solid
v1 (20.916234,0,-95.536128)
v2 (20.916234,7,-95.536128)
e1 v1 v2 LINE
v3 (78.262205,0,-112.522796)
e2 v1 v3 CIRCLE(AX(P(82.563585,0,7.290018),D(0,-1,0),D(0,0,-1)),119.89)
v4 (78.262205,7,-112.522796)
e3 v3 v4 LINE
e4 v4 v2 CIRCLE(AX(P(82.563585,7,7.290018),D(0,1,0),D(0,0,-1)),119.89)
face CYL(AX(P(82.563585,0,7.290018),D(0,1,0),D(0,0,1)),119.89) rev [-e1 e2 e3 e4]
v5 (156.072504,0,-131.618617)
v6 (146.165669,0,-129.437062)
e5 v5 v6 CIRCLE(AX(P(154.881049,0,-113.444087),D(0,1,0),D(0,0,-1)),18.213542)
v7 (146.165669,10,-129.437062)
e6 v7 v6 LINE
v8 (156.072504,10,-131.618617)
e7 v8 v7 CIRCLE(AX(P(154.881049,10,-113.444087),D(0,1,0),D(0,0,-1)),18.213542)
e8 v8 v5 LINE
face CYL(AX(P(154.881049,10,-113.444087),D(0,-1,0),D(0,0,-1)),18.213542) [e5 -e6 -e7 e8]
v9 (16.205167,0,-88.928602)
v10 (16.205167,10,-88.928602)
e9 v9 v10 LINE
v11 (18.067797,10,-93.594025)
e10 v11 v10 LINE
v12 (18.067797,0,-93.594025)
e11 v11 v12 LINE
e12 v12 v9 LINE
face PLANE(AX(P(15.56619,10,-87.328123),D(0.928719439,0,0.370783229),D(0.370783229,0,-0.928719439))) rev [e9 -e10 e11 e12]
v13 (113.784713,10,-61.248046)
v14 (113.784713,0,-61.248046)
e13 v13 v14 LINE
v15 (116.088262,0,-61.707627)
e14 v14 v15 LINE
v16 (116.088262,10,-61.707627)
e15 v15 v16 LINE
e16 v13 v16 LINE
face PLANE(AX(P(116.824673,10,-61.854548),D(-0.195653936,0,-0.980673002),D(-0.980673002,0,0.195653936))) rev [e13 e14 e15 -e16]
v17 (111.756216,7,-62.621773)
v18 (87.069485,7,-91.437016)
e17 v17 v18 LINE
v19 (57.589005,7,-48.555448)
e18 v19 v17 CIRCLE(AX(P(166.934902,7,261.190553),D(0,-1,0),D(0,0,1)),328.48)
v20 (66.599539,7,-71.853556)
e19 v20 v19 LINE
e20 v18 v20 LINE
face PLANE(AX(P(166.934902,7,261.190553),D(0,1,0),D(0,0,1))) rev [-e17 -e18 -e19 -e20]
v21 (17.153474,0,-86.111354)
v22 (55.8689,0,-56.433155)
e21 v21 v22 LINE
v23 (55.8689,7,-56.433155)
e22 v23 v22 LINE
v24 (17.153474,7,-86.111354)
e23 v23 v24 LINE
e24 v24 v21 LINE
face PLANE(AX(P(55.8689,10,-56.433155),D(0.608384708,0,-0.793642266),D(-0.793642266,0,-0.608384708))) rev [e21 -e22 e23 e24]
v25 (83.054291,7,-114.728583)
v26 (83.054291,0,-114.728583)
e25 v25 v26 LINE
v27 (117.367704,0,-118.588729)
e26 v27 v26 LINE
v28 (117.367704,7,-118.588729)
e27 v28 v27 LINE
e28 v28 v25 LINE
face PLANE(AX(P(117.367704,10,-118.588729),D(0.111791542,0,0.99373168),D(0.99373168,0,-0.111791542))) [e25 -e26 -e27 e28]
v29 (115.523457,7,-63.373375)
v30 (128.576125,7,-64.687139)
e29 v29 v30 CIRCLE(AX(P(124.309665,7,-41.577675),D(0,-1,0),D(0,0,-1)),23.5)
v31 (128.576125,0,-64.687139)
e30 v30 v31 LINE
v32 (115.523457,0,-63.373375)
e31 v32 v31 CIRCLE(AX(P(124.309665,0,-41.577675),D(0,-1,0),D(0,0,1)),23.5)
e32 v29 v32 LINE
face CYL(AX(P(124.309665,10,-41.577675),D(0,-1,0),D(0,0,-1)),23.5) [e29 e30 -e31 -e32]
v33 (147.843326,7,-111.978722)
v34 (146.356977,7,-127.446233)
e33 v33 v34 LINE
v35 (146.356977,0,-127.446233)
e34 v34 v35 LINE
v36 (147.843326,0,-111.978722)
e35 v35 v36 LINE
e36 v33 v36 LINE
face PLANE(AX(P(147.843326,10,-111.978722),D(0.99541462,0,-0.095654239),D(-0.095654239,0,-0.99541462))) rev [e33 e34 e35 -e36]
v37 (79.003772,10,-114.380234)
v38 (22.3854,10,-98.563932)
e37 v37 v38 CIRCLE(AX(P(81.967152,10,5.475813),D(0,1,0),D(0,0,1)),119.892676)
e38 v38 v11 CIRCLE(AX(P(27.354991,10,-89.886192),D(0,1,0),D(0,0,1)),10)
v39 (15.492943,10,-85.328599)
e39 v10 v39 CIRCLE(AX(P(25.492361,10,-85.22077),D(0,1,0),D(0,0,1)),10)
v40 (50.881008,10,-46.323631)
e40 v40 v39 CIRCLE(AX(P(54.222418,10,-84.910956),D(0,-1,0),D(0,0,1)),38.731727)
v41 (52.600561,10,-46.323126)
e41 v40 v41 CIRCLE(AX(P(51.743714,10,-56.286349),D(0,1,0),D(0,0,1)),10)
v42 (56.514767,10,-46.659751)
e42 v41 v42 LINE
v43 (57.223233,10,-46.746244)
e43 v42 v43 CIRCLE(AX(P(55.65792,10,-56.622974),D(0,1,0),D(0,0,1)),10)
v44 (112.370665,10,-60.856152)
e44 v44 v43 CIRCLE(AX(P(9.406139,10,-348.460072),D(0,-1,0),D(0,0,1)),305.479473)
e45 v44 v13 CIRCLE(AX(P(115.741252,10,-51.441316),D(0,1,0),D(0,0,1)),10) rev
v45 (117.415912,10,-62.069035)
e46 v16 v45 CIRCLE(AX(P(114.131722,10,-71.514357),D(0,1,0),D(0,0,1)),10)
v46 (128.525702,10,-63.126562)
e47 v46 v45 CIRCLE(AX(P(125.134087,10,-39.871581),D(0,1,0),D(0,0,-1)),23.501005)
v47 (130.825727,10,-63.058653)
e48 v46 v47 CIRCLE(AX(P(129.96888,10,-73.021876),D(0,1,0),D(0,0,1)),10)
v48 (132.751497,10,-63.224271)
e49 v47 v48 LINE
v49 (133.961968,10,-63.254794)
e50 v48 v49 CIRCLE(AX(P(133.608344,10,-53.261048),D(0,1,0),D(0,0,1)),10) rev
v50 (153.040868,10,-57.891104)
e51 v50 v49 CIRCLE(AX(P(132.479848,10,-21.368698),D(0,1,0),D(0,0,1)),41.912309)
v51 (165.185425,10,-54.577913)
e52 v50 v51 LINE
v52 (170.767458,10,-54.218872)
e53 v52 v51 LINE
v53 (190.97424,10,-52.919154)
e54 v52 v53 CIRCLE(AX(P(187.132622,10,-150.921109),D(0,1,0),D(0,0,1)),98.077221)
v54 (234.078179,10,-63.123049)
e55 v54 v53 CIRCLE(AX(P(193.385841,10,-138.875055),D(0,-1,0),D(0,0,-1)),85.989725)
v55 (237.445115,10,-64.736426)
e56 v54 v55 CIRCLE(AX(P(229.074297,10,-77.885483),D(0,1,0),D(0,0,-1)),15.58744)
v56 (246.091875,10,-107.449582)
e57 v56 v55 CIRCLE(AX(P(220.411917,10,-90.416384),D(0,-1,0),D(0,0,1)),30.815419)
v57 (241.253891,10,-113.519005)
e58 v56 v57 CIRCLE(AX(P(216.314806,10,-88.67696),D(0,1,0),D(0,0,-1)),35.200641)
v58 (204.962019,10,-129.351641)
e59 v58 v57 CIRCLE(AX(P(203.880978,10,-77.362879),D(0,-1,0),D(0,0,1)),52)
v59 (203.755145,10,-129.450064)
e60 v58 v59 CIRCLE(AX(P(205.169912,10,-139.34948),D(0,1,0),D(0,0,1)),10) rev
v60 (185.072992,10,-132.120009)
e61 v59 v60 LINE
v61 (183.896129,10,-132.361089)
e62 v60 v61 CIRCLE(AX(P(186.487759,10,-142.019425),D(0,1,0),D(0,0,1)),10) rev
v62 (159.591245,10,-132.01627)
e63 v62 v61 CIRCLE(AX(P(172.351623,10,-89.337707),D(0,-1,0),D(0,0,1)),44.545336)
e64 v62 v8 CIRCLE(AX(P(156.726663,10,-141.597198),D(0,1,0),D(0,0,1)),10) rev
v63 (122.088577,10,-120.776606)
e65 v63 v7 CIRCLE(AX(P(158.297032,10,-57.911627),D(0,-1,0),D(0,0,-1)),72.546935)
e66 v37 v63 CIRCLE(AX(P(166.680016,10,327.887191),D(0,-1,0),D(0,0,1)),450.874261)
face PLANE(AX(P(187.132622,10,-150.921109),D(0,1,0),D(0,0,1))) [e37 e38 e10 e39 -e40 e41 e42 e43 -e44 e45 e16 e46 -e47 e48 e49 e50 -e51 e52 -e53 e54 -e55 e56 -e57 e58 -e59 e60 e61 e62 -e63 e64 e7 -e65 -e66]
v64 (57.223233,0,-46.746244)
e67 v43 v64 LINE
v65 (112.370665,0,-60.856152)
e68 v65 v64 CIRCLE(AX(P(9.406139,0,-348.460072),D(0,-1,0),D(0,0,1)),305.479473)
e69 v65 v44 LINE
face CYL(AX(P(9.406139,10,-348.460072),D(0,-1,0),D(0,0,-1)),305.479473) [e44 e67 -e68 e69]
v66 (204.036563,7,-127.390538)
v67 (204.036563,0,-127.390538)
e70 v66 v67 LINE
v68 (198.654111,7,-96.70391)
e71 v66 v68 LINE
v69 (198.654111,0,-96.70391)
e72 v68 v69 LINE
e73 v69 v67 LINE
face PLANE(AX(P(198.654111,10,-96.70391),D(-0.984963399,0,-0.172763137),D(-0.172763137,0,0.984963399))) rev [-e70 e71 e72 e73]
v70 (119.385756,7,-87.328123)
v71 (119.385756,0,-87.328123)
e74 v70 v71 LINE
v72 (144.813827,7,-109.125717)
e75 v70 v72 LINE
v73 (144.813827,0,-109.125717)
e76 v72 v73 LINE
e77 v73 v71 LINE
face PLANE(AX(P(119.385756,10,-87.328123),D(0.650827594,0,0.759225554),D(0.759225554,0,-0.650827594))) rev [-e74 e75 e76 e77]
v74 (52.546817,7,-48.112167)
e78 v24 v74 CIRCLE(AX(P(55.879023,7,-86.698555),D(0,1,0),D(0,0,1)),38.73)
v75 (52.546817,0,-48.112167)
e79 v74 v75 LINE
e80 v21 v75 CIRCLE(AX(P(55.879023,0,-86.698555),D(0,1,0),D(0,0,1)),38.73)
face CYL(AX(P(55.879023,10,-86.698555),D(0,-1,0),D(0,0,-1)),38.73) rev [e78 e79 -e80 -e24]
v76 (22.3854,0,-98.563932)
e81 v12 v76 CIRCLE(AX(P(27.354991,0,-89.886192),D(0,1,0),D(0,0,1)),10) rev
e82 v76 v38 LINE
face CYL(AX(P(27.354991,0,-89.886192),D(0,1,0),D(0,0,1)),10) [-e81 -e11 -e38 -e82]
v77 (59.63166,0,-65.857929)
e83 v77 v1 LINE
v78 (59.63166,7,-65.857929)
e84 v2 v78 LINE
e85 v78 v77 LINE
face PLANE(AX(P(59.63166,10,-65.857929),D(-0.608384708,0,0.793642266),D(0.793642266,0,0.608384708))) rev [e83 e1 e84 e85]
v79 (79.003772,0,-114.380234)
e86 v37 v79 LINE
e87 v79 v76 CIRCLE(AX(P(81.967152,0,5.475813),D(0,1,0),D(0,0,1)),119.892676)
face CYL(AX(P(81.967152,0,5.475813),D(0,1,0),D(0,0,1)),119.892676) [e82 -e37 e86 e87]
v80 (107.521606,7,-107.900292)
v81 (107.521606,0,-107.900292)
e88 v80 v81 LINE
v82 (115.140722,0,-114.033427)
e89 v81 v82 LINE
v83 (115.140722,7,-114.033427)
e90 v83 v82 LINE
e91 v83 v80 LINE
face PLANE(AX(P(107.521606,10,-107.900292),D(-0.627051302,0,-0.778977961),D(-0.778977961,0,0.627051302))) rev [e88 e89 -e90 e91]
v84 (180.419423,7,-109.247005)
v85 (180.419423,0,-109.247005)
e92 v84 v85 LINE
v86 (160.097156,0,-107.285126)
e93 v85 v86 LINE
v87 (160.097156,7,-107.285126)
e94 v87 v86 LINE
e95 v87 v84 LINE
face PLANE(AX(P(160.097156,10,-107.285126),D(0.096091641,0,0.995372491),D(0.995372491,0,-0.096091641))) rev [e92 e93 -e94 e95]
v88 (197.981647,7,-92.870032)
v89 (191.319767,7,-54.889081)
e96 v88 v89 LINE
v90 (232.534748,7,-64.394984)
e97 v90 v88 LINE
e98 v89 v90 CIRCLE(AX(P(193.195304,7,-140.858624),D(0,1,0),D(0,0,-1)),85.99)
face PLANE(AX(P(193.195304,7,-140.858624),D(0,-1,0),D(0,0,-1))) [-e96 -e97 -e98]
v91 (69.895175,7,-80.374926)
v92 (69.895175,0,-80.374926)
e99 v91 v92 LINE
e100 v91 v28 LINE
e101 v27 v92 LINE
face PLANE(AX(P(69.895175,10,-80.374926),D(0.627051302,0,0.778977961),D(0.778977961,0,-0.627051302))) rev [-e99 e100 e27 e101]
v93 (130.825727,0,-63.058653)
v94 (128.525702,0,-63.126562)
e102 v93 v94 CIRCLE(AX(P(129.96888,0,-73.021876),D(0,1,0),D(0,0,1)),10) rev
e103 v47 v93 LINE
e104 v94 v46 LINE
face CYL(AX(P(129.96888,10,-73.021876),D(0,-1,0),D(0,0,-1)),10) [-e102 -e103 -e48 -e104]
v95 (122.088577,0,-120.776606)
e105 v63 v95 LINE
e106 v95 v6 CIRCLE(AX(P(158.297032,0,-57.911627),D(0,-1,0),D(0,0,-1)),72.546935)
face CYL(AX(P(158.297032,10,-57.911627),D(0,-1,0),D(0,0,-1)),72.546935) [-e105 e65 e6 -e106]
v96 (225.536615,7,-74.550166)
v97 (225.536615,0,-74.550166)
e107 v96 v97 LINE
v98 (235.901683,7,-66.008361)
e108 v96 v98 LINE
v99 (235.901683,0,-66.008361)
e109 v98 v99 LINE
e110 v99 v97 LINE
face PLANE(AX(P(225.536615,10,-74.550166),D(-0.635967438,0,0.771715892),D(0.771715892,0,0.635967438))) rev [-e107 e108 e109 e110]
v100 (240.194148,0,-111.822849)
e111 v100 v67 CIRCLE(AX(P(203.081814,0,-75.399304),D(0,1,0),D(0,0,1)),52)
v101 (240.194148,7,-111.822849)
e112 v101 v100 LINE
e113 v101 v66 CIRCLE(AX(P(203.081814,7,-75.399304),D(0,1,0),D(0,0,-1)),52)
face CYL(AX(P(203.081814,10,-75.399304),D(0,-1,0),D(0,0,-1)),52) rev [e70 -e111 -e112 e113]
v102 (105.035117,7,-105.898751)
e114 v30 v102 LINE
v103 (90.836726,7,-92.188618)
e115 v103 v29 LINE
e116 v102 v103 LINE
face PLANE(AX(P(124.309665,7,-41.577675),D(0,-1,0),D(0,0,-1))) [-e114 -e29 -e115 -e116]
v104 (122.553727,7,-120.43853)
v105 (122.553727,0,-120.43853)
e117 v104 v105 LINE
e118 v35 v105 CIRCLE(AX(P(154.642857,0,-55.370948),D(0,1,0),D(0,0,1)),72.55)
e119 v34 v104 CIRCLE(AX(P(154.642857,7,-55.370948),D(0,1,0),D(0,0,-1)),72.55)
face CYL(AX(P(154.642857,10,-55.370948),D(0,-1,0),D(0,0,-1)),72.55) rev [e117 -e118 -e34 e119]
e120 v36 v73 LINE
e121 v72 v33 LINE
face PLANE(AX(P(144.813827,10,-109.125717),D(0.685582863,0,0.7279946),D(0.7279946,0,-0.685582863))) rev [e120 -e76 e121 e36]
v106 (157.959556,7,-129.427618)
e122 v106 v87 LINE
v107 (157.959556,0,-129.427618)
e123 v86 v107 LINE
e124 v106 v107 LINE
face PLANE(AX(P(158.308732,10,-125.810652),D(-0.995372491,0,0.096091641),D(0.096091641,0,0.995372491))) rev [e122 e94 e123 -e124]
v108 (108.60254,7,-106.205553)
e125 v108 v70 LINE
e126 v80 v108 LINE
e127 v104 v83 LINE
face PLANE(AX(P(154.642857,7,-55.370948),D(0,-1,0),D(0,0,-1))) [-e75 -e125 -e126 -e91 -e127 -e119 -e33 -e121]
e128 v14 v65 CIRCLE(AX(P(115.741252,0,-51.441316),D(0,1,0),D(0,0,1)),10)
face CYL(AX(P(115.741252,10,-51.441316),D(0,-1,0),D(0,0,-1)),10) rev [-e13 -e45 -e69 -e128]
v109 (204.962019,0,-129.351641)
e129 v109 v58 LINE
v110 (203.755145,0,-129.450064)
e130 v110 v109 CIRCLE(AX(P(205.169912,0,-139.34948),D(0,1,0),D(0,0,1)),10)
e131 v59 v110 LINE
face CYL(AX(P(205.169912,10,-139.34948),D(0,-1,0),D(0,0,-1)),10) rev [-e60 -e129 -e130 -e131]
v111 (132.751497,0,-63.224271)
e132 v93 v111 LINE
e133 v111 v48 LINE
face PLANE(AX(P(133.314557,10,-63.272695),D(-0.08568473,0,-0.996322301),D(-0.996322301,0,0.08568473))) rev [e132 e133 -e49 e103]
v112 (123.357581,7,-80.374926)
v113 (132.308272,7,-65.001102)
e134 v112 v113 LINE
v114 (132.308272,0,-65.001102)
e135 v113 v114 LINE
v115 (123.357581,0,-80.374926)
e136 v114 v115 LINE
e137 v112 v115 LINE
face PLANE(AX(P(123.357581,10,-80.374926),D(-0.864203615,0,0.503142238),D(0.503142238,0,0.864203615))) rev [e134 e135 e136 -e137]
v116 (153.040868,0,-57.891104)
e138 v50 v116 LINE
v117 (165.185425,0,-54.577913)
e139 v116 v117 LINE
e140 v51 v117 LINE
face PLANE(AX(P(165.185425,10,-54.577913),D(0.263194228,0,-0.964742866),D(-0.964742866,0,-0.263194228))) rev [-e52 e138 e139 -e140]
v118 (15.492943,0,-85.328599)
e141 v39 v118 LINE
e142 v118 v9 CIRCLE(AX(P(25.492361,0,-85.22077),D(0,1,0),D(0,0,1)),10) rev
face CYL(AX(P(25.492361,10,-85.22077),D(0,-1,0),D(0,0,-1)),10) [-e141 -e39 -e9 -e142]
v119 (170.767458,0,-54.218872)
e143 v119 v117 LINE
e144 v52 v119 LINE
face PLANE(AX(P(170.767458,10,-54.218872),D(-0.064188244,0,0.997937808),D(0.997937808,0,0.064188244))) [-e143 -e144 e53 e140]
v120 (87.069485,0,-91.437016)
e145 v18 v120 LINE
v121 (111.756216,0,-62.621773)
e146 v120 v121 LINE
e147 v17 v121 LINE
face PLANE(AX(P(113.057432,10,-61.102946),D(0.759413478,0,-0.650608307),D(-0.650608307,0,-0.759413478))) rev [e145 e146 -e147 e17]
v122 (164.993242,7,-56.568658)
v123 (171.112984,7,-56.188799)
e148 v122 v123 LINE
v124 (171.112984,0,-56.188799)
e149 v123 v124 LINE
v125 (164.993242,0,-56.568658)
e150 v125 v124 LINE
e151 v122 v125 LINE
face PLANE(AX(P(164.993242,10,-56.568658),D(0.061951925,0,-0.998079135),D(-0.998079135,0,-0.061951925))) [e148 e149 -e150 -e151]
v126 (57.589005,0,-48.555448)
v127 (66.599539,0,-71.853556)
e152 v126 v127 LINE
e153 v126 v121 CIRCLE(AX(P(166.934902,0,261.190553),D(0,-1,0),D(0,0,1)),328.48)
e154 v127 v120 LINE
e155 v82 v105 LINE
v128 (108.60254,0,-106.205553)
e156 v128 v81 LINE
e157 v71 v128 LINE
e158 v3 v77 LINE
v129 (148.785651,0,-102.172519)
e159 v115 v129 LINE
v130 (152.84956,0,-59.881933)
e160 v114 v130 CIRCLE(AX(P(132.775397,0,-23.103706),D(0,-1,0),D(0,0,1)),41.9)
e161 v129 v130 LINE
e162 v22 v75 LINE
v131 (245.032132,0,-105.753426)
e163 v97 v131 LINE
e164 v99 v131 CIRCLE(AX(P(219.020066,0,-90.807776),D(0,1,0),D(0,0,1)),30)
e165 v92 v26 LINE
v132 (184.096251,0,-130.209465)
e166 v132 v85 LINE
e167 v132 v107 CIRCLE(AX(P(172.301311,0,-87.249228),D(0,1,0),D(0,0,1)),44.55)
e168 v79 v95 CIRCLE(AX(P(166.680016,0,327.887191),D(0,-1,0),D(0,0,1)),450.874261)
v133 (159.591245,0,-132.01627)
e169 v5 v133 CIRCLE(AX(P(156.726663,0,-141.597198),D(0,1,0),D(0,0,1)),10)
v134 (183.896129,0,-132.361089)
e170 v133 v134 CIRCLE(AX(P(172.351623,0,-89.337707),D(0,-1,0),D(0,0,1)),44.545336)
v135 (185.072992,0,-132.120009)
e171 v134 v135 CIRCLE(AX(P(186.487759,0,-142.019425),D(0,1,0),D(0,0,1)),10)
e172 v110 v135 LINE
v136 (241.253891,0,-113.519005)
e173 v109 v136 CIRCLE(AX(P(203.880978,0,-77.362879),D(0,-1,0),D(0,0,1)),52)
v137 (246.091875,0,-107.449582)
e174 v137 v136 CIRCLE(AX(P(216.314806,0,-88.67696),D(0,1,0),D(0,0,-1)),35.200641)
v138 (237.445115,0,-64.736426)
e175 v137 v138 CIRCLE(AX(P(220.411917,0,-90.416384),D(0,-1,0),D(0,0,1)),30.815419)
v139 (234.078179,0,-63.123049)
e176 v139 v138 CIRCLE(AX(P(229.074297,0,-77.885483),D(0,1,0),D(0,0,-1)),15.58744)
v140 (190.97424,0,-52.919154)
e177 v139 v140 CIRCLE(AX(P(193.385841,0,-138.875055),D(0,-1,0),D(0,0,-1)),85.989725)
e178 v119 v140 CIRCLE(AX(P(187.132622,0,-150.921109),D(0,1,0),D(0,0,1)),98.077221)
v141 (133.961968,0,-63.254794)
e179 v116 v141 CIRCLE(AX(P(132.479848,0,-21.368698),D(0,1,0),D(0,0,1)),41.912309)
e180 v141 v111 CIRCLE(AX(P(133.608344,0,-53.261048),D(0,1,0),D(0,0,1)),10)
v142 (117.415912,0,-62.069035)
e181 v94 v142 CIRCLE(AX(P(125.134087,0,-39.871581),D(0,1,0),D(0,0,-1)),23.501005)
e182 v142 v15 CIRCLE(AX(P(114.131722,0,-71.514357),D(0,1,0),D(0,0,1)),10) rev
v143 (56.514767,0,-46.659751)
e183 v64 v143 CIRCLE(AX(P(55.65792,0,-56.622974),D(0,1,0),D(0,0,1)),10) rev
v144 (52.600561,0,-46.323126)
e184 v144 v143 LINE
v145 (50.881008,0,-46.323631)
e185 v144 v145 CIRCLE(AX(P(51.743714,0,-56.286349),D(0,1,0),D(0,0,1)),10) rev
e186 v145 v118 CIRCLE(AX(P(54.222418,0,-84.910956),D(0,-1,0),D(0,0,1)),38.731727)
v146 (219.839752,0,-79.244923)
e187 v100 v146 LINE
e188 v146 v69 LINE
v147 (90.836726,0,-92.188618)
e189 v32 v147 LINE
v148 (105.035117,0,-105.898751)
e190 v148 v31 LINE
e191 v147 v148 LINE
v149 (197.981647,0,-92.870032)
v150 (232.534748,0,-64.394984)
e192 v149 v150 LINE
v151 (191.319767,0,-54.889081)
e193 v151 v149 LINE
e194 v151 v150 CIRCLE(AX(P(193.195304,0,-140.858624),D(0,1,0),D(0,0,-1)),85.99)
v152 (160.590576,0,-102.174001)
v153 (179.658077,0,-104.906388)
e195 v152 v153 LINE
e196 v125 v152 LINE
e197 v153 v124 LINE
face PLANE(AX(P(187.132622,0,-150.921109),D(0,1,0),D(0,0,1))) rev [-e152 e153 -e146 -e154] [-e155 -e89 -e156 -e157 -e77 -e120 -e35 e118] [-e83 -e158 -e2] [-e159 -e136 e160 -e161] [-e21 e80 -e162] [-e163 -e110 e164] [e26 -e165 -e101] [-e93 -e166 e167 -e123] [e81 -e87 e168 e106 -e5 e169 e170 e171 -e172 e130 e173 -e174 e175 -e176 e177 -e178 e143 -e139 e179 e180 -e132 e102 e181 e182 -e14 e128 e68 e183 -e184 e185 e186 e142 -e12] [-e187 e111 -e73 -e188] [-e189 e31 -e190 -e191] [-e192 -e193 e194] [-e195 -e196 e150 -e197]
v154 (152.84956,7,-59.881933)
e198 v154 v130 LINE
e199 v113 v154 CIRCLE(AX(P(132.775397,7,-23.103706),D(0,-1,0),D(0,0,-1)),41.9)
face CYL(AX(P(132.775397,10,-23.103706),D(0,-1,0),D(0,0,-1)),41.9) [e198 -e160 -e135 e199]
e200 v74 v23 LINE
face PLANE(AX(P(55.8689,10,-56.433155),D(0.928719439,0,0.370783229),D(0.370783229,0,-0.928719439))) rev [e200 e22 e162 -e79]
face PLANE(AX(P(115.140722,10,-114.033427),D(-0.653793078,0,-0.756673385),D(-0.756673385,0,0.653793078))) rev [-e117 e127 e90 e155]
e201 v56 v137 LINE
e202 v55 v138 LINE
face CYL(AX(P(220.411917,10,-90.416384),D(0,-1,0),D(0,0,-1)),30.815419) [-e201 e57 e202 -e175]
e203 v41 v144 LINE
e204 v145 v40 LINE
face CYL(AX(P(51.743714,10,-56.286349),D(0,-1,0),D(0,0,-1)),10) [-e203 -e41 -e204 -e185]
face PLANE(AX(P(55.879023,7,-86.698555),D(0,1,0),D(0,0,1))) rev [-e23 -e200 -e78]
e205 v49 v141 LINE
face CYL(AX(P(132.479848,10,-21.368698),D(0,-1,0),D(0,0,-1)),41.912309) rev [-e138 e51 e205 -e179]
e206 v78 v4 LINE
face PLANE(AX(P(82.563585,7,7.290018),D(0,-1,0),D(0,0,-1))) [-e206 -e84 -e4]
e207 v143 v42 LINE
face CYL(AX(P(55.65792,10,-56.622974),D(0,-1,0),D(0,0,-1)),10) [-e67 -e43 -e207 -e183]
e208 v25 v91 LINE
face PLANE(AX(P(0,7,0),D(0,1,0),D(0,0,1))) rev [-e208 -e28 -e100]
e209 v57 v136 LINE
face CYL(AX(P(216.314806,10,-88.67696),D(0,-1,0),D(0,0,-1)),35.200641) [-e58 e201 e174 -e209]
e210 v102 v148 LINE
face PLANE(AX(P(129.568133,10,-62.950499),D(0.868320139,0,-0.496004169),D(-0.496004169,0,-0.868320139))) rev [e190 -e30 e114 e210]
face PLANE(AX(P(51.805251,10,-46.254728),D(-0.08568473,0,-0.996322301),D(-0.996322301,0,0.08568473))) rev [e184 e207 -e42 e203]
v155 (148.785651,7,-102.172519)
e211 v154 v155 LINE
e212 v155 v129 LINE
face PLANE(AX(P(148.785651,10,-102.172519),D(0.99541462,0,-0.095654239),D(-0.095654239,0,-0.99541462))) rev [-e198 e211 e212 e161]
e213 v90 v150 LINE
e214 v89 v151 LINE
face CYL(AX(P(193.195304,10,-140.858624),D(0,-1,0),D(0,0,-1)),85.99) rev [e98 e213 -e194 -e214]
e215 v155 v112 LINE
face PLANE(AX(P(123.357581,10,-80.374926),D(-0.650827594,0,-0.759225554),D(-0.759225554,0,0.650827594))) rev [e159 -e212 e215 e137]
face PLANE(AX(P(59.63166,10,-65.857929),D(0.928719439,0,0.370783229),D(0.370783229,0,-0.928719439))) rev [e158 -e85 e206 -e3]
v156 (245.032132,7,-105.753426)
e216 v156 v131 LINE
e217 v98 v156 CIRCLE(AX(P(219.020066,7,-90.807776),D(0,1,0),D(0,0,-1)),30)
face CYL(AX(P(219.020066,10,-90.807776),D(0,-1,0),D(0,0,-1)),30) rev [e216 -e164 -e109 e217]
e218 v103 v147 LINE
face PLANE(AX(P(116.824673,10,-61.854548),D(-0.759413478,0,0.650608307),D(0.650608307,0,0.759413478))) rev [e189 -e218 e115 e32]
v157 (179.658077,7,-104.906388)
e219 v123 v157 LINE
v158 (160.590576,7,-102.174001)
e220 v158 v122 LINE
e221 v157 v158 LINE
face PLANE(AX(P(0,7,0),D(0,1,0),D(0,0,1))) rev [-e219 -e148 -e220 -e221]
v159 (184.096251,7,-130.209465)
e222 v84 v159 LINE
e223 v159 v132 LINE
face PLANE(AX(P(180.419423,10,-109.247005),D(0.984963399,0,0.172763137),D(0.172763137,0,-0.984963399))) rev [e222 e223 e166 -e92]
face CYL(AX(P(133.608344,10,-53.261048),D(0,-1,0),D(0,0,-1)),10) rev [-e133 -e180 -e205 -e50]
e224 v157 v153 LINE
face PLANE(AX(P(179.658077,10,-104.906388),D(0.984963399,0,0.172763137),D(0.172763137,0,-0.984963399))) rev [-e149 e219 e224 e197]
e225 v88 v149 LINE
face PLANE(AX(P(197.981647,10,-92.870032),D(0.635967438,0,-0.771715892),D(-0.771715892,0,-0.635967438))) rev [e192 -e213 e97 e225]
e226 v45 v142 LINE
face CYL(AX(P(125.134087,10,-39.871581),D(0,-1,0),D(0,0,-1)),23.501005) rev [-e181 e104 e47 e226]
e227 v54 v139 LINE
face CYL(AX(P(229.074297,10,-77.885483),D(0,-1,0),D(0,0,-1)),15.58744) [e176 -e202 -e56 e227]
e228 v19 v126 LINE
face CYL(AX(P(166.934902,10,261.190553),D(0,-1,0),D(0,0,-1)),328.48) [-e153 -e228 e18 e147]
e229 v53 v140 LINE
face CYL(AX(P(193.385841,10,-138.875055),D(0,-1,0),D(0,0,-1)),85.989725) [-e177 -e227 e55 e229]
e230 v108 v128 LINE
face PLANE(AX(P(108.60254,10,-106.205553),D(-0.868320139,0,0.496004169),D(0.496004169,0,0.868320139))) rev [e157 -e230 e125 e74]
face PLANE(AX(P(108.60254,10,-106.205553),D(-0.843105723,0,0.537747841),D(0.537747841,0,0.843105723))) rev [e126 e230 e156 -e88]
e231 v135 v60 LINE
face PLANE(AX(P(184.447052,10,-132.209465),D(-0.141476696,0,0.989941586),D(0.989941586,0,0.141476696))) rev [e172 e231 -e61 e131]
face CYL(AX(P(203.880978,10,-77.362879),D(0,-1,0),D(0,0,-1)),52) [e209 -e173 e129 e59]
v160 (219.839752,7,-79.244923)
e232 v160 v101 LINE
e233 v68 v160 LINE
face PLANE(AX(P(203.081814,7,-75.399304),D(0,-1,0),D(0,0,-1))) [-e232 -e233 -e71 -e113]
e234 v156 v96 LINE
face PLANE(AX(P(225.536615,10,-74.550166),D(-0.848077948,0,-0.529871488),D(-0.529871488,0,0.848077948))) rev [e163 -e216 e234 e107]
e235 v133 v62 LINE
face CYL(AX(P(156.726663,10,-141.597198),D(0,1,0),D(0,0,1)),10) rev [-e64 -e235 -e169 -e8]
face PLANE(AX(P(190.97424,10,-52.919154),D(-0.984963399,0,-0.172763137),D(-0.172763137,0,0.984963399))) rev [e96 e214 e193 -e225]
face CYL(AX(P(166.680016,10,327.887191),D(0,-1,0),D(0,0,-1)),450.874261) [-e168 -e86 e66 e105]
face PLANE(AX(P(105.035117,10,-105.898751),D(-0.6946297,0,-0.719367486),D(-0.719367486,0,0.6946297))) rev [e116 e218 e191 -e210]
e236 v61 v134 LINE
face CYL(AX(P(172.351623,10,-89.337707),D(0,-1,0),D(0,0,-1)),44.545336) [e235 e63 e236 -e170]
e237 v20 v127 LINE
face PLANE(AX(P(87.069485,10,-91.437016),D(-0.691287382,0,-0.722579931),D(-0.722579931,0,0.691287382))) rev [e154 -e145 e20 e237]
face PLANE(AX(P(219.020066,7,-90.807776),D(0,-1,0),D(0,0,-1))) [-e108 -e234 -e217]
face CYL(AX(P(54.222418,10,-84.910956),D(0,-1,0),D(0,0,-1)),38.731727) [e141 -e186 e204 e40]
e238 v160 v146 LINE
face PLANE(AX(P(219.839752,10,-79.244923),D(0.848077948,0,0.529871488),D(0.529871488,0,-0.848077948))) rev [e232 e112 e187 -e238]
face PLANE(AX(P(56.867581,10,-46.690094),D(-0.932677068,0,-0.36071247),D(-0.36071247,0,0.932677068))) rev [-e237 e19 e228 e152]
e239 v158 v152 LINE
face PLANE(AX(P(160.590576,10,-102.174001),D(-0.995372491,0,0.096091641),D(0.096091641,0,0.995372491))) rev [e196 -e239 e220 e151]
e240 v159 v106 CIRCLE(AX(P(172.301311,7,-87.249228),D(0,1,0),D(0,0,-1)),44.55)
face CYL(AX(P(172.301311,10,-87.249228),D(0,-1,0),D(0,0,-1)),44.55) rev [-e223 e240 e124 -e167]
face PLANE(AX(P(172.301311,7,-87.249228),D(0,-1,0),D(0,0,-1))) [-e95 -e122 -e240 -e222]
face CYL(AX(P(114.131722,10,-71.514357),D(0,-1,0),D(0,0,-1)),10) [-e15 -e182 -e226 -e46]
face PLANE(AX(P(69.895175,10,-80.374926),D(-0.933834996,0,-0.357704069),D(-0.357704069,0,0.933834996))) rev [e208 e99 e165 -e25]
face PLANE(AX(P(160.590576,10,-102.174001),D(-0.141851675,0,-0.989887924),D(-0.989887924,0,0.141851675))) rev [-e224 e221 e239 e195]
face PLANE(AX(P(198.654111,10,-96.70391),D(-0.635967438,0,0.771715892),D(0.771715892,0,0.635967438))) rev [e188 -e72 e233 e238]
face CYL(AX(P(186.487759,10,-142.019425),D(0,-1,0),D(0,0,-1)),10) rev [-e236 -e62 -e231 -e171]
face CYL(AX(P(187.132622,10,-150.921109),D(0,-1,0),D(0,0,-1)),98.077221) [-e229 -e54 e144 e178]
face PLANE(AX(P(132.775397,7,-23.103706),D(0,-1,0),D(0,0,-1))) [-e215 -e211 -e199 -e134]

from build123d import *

# Parameters (mm, degrees)
BOSS_EXTRUDE1_DEPTH  = 10
BOSS_EXTRUDE2_DEPTH  = 10
FILLET1_R            = 10
BOSS_EXTRUDE3_DEPTH  = 10
FILLET2_R            = 10
FILLET3_R            = 10
BOSS_EXTRUDE4_DEPTH  = 10
BOSS_EXTRUDE5_DEPTH  = 10
BOSS_EXTRUDE6_DEPTH  = 10
BOSS_EXTRUDE7_DEPTH  = 10
BOSS_EXTRUDE8_DEPTH  = 10
BOSS_EXTRUDE9_DEPTH  = 10
BOSS_EXTRUDE10_DEPTH = 10
BOSS_EXTRUDE11_DEPTH = 10
BOSS_EXTRUDE12_DEPTH = 10
BOSS_EXTRUDE13_DEPTH = 10
FILLET4_R            = 10
FILLET5_R            = 10
FILLET6_R            = 10
BOSS_EXTRUDE14_DEPTH = 3
BOSS_EXTRUDE16_START = -3
BOSS_EXTRUDE16_DEPTH = 3
BOSS_EXTRUDE17_START = -3
BOSS_EXTRUDE17_DEPTH = 3
BOSS_EXTRUDE18_DEPTH = 3
BOSS_EXTRUDE19_START = -3
BOSS_EXTRUDE19_DEPTH = 3
BOSS_EXTRUDE20_START = -3
BOSS_EXTRUDE20_DEPTH = 3
BOSS_EXTRUDE21_START = -3
BOSS_EXTRUDE21_DEPTH = 3
BOSS_EXTRUDE22_START = -3
BOSS_EXTRUDE22_DEPTH = 3
BOSS_EXTRUDE23_DEPTH = 3
BOSS_EXTRUDE24_DEPTH = 3
BOSS_EXTRUDE25_START = -3
BOSS_EXTRUDE25_DEPTH = 3
BOSS_EXTRUDE26_START = -3
BOSS_EXTRUDE26_DEPTH = 3
BOSS_EXTRUDE27_START = -3
BOSS_EXTRUDE27_DEPTH = 3


with BuildPart() as part:
    # Sketch1 → Boss-Extrude1 (new body)
    with BuildSketch(Plane(origin=(0, 0, 0), x_dir=(1, 0, 0), z_dir=(0, 1, 0))):
        with BuildLine():
            Line((51.805250568, 46.254728184), (56.867580546, 46.690093705))
            Line((56.867580546, 46.690093705), (66.599539174, 71.853555984))
            Line((66.599539174, 71.853555984), (87.069484898, 91.437016001))
            Line((87.069484898, 91.437016001), (113.057432433, 61.102946487))
            Line((113.057432433, 61.102946487), (116.82467317, 61.854548169))
            Line((116.82467317, 61.854548169), (90.836725634, 92.188617682))
            Line((90.836725634, 92.188617682), (105.035116548, 105.898750841))
            Line((105.035116548, 105.898750841), (129.568132848, 62.950498647))
            Line((129.568132848, 62.950498647), (133.31455682, 63.272694914))
            Line((133.31455682, 63.272694914), (123.357580852, 80.374925591))
            Line((123.357580852, 80.374925591), (148.785651419, 102.172519068))
            Line((148.785651419, 102.172519068), (153.040868267, 57.891104139))
            Line((153.040868267, 57.891104139), (165.185425052, 54.57791328))
            Line((165.185425052, 54.57791328), (160.590576177, 102.174000873))
            Line((160.590576177, 102.174000873), (179.658076638, 104.906387862))
            Line((179.658076638, 104.906387862), (170.767457679, 54.218871994))
            ThreePointArc((170.767457679, 54.218871994), (180.837217506, 53.04614218), (190.97424035, 52.919153825))
            Line((190.97424035, 52.919153825), (197.981646973, 92.870031941))
            Line((197.981646973, 92.870031941), (234.078179475, 63.123049205))
            ThreePointArc((234.078179475, 63.123049205), (235.810126624, 63.828566908), (237.445115175, 64.736426258))
            Line((237.445115175, 64.736426258), (225.536614511, 74.55016567))
            Line((225.536614511, 74.55016567), (246.091874592, 107.449582187))
            ThreePointArc((246.091874592, 107.449582187), (243.840681793, 110.618047464), (241.25389096, 113.519004964))
            Line((241.25389096, 113.519004964), (240.395012362, 112.144339568))
            Line((240.395012362, 112.144339568), (219.839752281, 79.244923051))
            Line((219.839752281, 79.244923051), (198.654111375, 96.703910123))
            Line((198.654111375, 96.703910123), (204.382089549, 129.360464852))
            Line((204.382089549, 129.360464852), (184.447051736, 132.209464557))
            Line((184.447051736, 132.209464557), (180.419423262, 109.247004562))
            Line((180.419423262, 109.247004562), (160.097156473, 107.285125983))
            Line((160.097156473, 107.285125983), (158.308732306, 125.810652197))
            Line((158.308732306, 125.810652197), (157.766479573, 131.427617904))
            ThreePointArc((157.766479573, 131.427617904), (151.800844978, 131.395283067), (146.165668691, 129.437061966))
            Line((146.165668691, 129.437061966), (147.843325617, 111.978721981))
            Line((147.843325617, 111.978721981), (144.813827038, 109.125716877))
            Line((144.813827038, 109.125716877), (119.385756471, 87.3281234))
            Line((119.385756471, 87.3281234), (108.602540339, 106.205552911))
            Line((108.602540339, 106.205552911), (107.52160572, 107.900291772))
            Line((107.52160572, 107.900291772), (115.140722033, 114.033426524))
            Line((115.140722033, 114.033426524), (122.553726759, 120.438529801))
            ThreePointArc((122.553726759, 120.438529801), (122.391169983, 120.703903688), (122.08857731, 120.776606365))
            Line((122.08857731, 120.776606365), (117.367703847, 118.588729188))
            Line((117.367703847, 118.588729188), (69.895175345, 80.374925591))
            Line((69.895175345, 80.374925591), (83.054291448, 114.72858327))
            Line((83.054291448, 114.72858327), (79.00377159, 114.380234447))
            Line((79.00377159, 114.380234447), (59.63165965, 65.85792942))
            Line((59.63165965, 65.85792942), (19.328949542, 96.752897561))
            Line((19.328949542, 96.752897561), (15.566189716, 87.3281234))
            Line((15.566189716, 87.3281234), (55.868899823, 56.433155258))
            Line((55.868899823, 56.433155258), (51.805250568, 46.254728184))
        make_face()
    extrude(amount=BOSS_EXTRUDE1_DEPTH)

    # Sketch3 → Boss-Extrude2 (add)
    with BuildSketch(Plane(origin=(0, 0, 0), x_dir=(-1, 0, 0), z_dir=(0, -1, 0))):
        with BuildLine():
            Line((-184.447051736, 132.209464557), (-184.096250604, 130.209464557))
            ThreePointArc((-184.096250604, 130.209464557), (-170.969249532, 131.779309143), (-157.95955632, 129.427617904))
            Line((-157.95955632, 129.427617904), (-157.766479573, 131.427617904))
            ThreePointArc((-157.766479573, 131.427617904), (-171.046827654, 133.863929723), (-184.447051736, 132.209464557))
        make_face()
    extrude(amount=-BOSS_EXTRUDE2_DEPTH)

    # Fillet1
    fillet1_edges = [part.edges().sort_by_distance(p)[0] for p in [
        (157.766479573, 5, -131.427617904),
    ]]
    fillet(fillet1_edges, radius=FILLET1_R)

    # Sketch4 → Boss-Extrude3 (add)
    with BuildSketch(Plane.XZ):
        with BuildLine():
            Line((241.25389096, -113.519004964), (240.194147983, -111.822849068))
            ThreePointArc((240.194147983, -111.822849068), (223.645469846, -123.160543749), (204.036563274, -127.390538053))
            Line((204.036563274, -127.390538053), (204.382089549, -129.360464852))
            ThreePointArc((204.382089549, -129.360464852), (224.4077507, -125.139982982), (241.25389096, -113.519004964))
        make_face()
    extrude(amount=-BOSS_EXTRUDE3_DEPTH)

    # Fillet2
    fillet2_edges = [part.edges().sort_by_distance(p)[0] for p in [
        (204.382089549, 5, -129.360464852),
    ]]
    fillet(fillet2_edges, radius=FILLET2_R)

    # Fillet3
    fillet3_edges = [part.edges().sort_by_distance(p)[0] for p in [
        (184.447051736, 5, -132.209464557),
    ]]
    fillet(fillet3_edges, radius=FILLET3_R)

    # Sketch5 → Boss-Extrude4 (add)
    with BuildSketch(Plane(origin=(0, 0, 0), x_dir=(-1, 0, 0), z_dir=(0, -1, 0))):
        with BuildLine():
            Line((-146.165668691, 129.437061966), (-146.35697717, 127.446232725))
            ThreePointArc((-146.35697717, 127.446232725), (-134.153534544, 124.9675725), (-122.553726759, 120.438529801))
            ThreePointArc((-122.553726759, 120.438529801), (-122.391169983, 120.703903688), (-122.08857731, 120.776606365))
            ThreePointArc((-122.08857731, 120.776606365), (-133.74228961, 126.176716529), (-146.165668691, 129.437061966))
        make_face()
    extrude(amount=-BOSS_EXTRUDE4_DEPTH)

    # Sketch6 → Boss-Extrude5 (add)
    with BuildSketch(Plane.XZ):
        with BuildLine():
            Line((117.367703847, -118.588729188), (83.054291448, -114.72858327))
            Line((83.054291448, -114.72858327), (79.00377159, -114.380234447))
            ThreePointArc((79.00377159, -114.380234447), (100.4688886, -118.099003928), (122.08857731, -120.776606365))
            Line((122.08857731, -120.776606365), (117.367703847, -118.588729188))
        make_face()
    extrude(amount=-BOSS_EXTRUDE5_DEPTH)

    # Sketch7 → Boss-Extrude6 (add)
    with BuildSketch(Plane(origin=(0, 10, 0), x_dir=(1, 0, 0), z_dir=(0, 1, 0))):
        with BuildLine():
            Line((79.00377159, 114.380234447), (78.262205131, 112.522795568))
            ThreePointArc((78.262205131, 112.522795568), (48.512953701, 107.66287103), (20.916234075, 95.536128144))
            Line((20.916234075, 95.536128144), (19.328949542, 96.752897561))
            ThreePointArc((19.328949542, 96.752897561), (48.002866802, 109.505407349), (79.00377159, 114.380234447))
        make_face()
    extrude(amount=-BOSS_EXTRUDE6_DEPTH)

    # Sketch8 → Boss-Extrude7 (add)
    with BuildSketch(Plane.XZ):
        with BuildLine():
            Line((51.805250568, -46.254728184), (52.546817026, -48.112167063))
            ThreePointArc((52.546817026, -48.112167063), (27.538270706, -60.301307017), (17.153474248, -86.111353983))
            Line((17.153474248, -86.111353983), (15.566189716, -87.3281234))
            ThreePointArc((15.566189716, -87.3281234), (25.179141466, -59.286070545), (51.805250568, -46.254728184))
        make_face()
    extrude(amount=-BOSS_EXTRUDE7_DEPTH)

    # Sketch9 → Boss-Extrude8 (add)
    with BuildSketch(Plane.XZ):
        with BuildLine():
            Line((56.867580546, -46.690093705), (57.589005486, -48.555447841))
            ThreePointArc((57.589005486, -48.555447841), (84.37250162, -56.744283383), (111.756215819, -62.621773443))
            Line((111.756215819, -62.621773443), (113.057432433, -61.102946487))
            ThreePointArc((113.057432433, -61.102946487), (85.305396239, -52.559732402), (56.867580546, -46.690093705))
        make_face()
    extrude(amount=-BOSS_EXTRUDE8_DEPTH)

    # Sketch10 → Boss-Extrude9 (add)
    with BuildSketch(Plane(origin=(0, 0, 0), x_dir=(-1, 0, 0), z_dir=(0, -1, 0))):
        with BuildLine():
            Line((-116.82467317, 61.854548169), (-115.523456556, 63.373375125))
            ThreePointArc((-115.523456556, 63.373375125), (-121.956257585, 64.95953709), (-128.576124511, 64.687138926))
            Line((-128.576124511, 64.687138926), (-129.568132848, 62.950498647))
            ThreePointArc((-129.568132848, 62.950498647), (-123.120409738, 63.286155655), (-116.82467317, 61.854548169))
        make_face()
    extrude(amount=-BOSS_EXTRUDE9_DEPTH)

    # Sketch11 → Boss-Extrude10 (add)
    with BuildSketch(Plane.XZ):
        with BuildLine():
            Line((153.040868267, -57.891104139), (152.849559788, -59.88193338))
            ThreePointArc((152.849559788, -59.88193338), (142.907546747, -63.760188349), (132.308272343, -65.001102144))
            Line((132.308272343, -65.001102144), (133.31455682, -63.272694914))
            ThreePointArc((133.31455682, -63.272694914), (143.510926178, -61.803299707), (153.040868267, -57.891104139))
        make_face()
    extrude(amount=-BOSS_EXTRUDE10_DEPTH)

    # Sketch12 → Boss-Extrude11 (add)
    with BuildSketch(Plane.XZ):
        Polygon((170.767457679, -54.218871994), (165.185425052, -54.57791328), (164.99324177, -56.568658263), (171.112983954, -56.188798793), align=None)
    extrude(amount=-BOSS_EXTRUDE11_DEPTH)

    # Sketch13 → Boss-Extrude12 (add)
    with BuildSketch(Plane.XZ):
        with BuildLine():
            Line((237.445115175, -64.736426258), (235.901683391, -66.008361134))
            ThreePointArc((235.901683391, -66.008361134), (248.258475049, -84.090973284), (245.032131615, -105.753426291))
            Line((245.032131615, -105.753426291), (246.091874592, -107.449582187))
            ThreePointArc((246.091874592, -107.449582187), (250.614679122, -84.302201712), (237.445115175, -64.736426258))
        make_face()
    extrude(amount=-BOSS_EXTRUDE12_DEPTH)

    # Sketch14 → Boss-Extrude13 (add)
    with BuildSketch(Plane.XZ):
        with BuildLine():
            Line((190.97424035, -52.919153825), (191.319766625, -54.889080624))
            ThreePointArc((191.319766625, -54.889080624), (212.52084719, -57.06838935), (232.534747692, -64.394984081))
            Line((232.534747692, -64.394984081), (234.078179475, -63.123049205))
            ThreePointArc((234.078179475, -63.123049205), (213.194515683, -55.198002086), (190.97424035, -52.919153825))
        make_face()
    extrude(amount=-BOSS_EXTRUDE13_DEPTH)

    # Fillet4
    fillet4_edges = [part.edges().sort_by_distance(p)[0] for p in [
        (133.31455682, 5, -63.272694914),
        (129.568132848, 5, -62.950498647),
        (116.82467317, 5, -61.854548169),
        (113.057432433, 5, -61.102946487),
    ]]
    fillet(fillet4_edges, radius=FILLET4_R)

    # Fillet5
    # the kernel refuses this fillet: 10 mm, written as the material it takes off along each edge
    with BuildSketch(Plane(origin=(56.867580546, -0.900144387, -46.690093705), x_dir=(0.9877650784630306, 0, -0.15594918970268098), z_dir=(0, 1, 0))) as fillet5_piece_1:
        with BuildLine():
            CenterArc((0.354164433, 9.999998263), FILLET5_R, 265.943550384, 4.090215864)
            Line((-0.353228281, 0.025049865), (0, 0))
            ThreePointArc((0, 0), (0.180028877, -5.3048e-05), (0.360057755, 0))
        make_face()
    extrude(amount=11.800288773, mode=Mode.SUBTRACT)
    with BuildSketch(Plane(origin=(51.805250568, -2.317018867, -46.254728184), x_dir=(0.9963223007849147, 0, -0.08568473002031346), z_dir=(0, 1, 0))) as fillet5_piece_2:
        with BuildLine():
            CenterArc((0.79824645, 10), FILLET5_R, 260.135505168, 9.864494831)
            ThreePointArc((-0.914939677, 0.147843216), (-0.45791207, 0.071184823), (0, 0))
            Line((0, 0), (0.79824645, 0))
        make_face()
    extrude(amount=14.634037735, mode=Mode.SUBTRACT)

    # Fillet6
    fillet6_edges = [part.edges().sort_by_distance(p)[0] for p in [
        (15.566189716, 5, -87.3281234),
        (19.328949542, 5, -96.752897561),
    ]]
    fillet(fillet6_edges, radius=FILLET6_R)

    # Sketch15 → Boss-Extrude14 (add)
    with BuildSketch(Plane(origin=(0, 10, 0), x_dir=(1, 0, 0), z_dir=(0, 1, 0))):
        with BuildLine():
            Line((78.262205131, 112.522795568), (59.63165965, 65.85792942))
            Line((59.63165965, 65.85792942), (20.916234075, 95.536128144))
            ThreePointArc((20.916234075, 95.536128144), (48.512953701, 107.66287103), (78.262205131, 112.522795568))
        make_face()
    extrude(amount=-BOSS_EXTRUDE14_DEPTH)

    # Sketch16 → Boss-Extrude16 (add)
    with BuildSketch(Plane(origin=(0, 10, 0), x_dir=(1, 0, 0), z_dir=(0, 1, 0)).offset(BOSS_EXTRUDE16_START)):
        with BuildLine():
            Line((52.546817026, 48.112167063), (55.868899823, 56.433155258))
            Line((55.868899823, 56.433155258), (17.153474248, 86.111353983))
            ThreePointArc((17.153474248, 86.111353983), (27.538270706, 60.301307017), (52.546817026, 48.112167063))
        make_face()
    extrude(amount=BOSS_EXTRUDE16_DEPTH)

    # Sketch20 → Boss-Extrude17 (add)
    with BuildSketch(Plane(origin=(0, 10, 0), x_dir=(1, 0, 0), z_dir=(0, 1, 0)).offset(BOSS_EXTRUDE17_START)):
        with BuildLine():
            Line((57.589005486, 48.555447841), (66.599539174, 71.853555984))
            Line((66.599539174, 71.853555984), (87.069484898, 91.437016001))
            Line((87.069484898, 91.437016001), (111.756215819, 62.621773443))
            ThreePointArc((111.756215819, 62.621773443), (84.37250162, 56.744283383), (57.589005486, 48.555447841))
        make_face()
    extrude(amount=BOSS_EXTRUDE17_DEPTH)

    # Sketch21 → Boss-Extrude18 (add)
    with BuildSketch(Plane(origin=(0, 10, 0), x_dir=(1, 0, 0), z_dir=(0, 1, 0))):
        Polygon((69.895175345, 80.374925591), (83.054291448, 114.72858327), (117.367703847, 118.588729188), align=None)
    extrude(amount=-BOSS_EXTRUDE18_DEPTH)

    # Sketch22 → Boss-Extrude19 (add)
    with BuildSketch(Plane(origin=(0, 10, 0), x_dir=(1, 0, 0), z_dir=(0, 1, 0)).offset(BOSS_EXTRUDE19_START)):
        with BuildLine():
            Line((115.523456556, 63.373375125), (90.836725634, 92.188617682))
            Line((90.836725634, 92.188617682), (105.035116548, 105.898750841))
            Line((105.035116548, 105.898750841), (128.576124511, 64.687138926))
            ThreePointArc((128.576124511, 64.687138926), (121.956257585, 64.95953709), (115.523456556, 63.373375125))
        make_face()
    extrude(amount=BOSS_EXTRUDE19_DEPTH)

    # Sketch23 → Boss-Extrude20 (add)
    with BuildSketch(Plane(origin=(0, 10, 0), x_dir=(1, 0, 0), z_dir=(0, 1, 0)).offset(BOSS_EXTRUDE20_START)):
        with BuildLine():
            Line((152.849559788, 59.88193338), (148.785651419, 102.172519068))
            Line((148.785651419, 102.172519068), (123.357580852, 80.374925591))
            Line((123.357580852, 80.374925591), (132.308272343, 65.001102144))
            ThreePointArc((132.308272343, 65.001102144), (142.907546747, 63.760188349), (152.849559788, 59.88193338))
        make_face()
    extrude(amount=BOSS_EXTRUDE20_DEPTH)

    # Sketch24 → Boss-Extrude21 (add)
    with BuildSketch(Plane(origin=(0, 10, 0), x_dir=(1, 0, 0), z_dir=(0, 1, 0)).offset(BOSS_EXTRUDE21_START)):
        with BuildLine():
            Line((107.52160572, 107.900291772), (108.602540339, 106.205552911))
            Line((108.602540339, 106.205552911), (119.385756471, 87.3281234))
            Line((119.385756471, 87.3281234), (147.843325617, 111.978721981))
            Line((147.843325617, 111.978721981), (146.35697717, 127.446232725))
            ThreePointArc((146.35697717, 127.446232725), (134.153534544, 124.9675725), (122.553726759, 120.438529801))
            Line((122.553726759, 120.438529801), (115.140722033, 114.033426524))
            Line((115.140722033, 114.033426524), (107.52160572, 107.900291772))
        make_face()
    extrude(amount=BOSS_EXTRUDE21_DEPTH)

    # Sketch25 → Boss-Extrude22 (add)
    with BuildSketch(Plane(origin=(0, 10, 0), x_dir=(1, 0, 0), z_dir=(0, 1, 0)).offset(BOSS_EXTRUDE22_START)):
        with BuildLine():
            Line((157.95955632, 129.427617904), (160.097156473, 107.285125983))
            Line((160.097156473, 107.285125983), (180.419423262, 109.247004562))
            Line((180.419423262, 109.247004562), (184.096250604, 130.209464557))
            ThreePointArc((184.096250604, 130.209464557), (170.969249532, 131.779309143), (157.95955632, 129.427617904))
        make_face()
    extrude(amount=BOSS_EXTRUDE22_DEPTH)

    # Sketch26 → Boss-Extrude23 (add)
    with BuildSketch(Plane(origin=(0, 10, 0), x_dir=(1, 0, 0), z_dir=(0, 1, 0))):
        Polygon((160.590576177, 102.174000873), (164.99324177, 56.568658263), (171.112983954, 56.188798793), (179.658076638, 104.906387862), align=None)
    extrude(amount=-BOSS_EXTRUDE23_DEPTH)

    # Sketch27 → Boss-Extrude24 (add)
    with BuildSketch(Plane(origin=(0, 10, 0), x_dir=(1, 0, 0), z_dir=(0, 1, 0))):
        Polygon((119.385756471, 87.3281234), (144.813827038, 109.125716877), (147.843325617, 111.978721981), align=None)
    extrude(amount=-BOSS_EXTRUDE24_DEPTH)

    # Sketch28 → Boss-Extrude25 (add)
    with BuildSketch(Plane(origin=(0, 10, 0), x_dir=(1, 0, 0), z_dir=(0, 1, 0)).offset(BOSS_EXTRUDE25_START)):
        with BuildLine():
            Line((235.901683391, 66.008361134), (225.536614511, 74.55016567))
            Line((225.536614511, 74.55016567), (245.032131615, 105.753426291))
            ThreePointArc((245.032131615, 105.753426291), (248.258475049, 84.090973284), (235.901683391, 66.008361134))
        make_face()
    extrude(amount=BOSS_EXTRUDE25_DEPTH)

    # Sketch29 → Boss-Extrude26 (add)
    with BuildSketch(Plane(origin=(0, 10, 0), x_dir=(1, 0, 0), z_dir=(0, 1, 0)).offset(BOSS_EXTRUDE26_START)):
        with BuildLine():
            Line((191.319766625, 54.889080624), (197.981646973, 92.870031941))
            Line((197.981646973, 92.870031941), (232.534747692, 64.394984081))
            ThreePointArc((232.534747692, 64.394984081), (212.52084719, 57.06838935), (191.319766625, 54.889080624))
        make_face()
    extrude(amount=BOSS_EXTRUDE26_DEPTH)

    # Sketch30 → Boss-Extrude27 (add)
    with BuildSketch(Plane(origin=(0, 10, 0), x_dir=(1, 0, 0), z_dir=(0, 1, 0)).offset(BOSS_EXTRUDE27_START)):
        with BuildLine():
            Line((204.036563274, 127.390538053), (198.654111375, 96.703910123))
            Line((198.654111375, 96.703910123), (219.839752281, 79.244923051))
            Line((219.839752281, 79.244923051), (240.194147983, 111.822849068))
            ThreePointArc((240.194147983, 111.822849068), (223.645469846, 123.160543749), (204.036563274, 127.390538053))
        make_face()
    extrude(amount=BOSS_EXTRUDE27_DEPTH)


solid = part.part
